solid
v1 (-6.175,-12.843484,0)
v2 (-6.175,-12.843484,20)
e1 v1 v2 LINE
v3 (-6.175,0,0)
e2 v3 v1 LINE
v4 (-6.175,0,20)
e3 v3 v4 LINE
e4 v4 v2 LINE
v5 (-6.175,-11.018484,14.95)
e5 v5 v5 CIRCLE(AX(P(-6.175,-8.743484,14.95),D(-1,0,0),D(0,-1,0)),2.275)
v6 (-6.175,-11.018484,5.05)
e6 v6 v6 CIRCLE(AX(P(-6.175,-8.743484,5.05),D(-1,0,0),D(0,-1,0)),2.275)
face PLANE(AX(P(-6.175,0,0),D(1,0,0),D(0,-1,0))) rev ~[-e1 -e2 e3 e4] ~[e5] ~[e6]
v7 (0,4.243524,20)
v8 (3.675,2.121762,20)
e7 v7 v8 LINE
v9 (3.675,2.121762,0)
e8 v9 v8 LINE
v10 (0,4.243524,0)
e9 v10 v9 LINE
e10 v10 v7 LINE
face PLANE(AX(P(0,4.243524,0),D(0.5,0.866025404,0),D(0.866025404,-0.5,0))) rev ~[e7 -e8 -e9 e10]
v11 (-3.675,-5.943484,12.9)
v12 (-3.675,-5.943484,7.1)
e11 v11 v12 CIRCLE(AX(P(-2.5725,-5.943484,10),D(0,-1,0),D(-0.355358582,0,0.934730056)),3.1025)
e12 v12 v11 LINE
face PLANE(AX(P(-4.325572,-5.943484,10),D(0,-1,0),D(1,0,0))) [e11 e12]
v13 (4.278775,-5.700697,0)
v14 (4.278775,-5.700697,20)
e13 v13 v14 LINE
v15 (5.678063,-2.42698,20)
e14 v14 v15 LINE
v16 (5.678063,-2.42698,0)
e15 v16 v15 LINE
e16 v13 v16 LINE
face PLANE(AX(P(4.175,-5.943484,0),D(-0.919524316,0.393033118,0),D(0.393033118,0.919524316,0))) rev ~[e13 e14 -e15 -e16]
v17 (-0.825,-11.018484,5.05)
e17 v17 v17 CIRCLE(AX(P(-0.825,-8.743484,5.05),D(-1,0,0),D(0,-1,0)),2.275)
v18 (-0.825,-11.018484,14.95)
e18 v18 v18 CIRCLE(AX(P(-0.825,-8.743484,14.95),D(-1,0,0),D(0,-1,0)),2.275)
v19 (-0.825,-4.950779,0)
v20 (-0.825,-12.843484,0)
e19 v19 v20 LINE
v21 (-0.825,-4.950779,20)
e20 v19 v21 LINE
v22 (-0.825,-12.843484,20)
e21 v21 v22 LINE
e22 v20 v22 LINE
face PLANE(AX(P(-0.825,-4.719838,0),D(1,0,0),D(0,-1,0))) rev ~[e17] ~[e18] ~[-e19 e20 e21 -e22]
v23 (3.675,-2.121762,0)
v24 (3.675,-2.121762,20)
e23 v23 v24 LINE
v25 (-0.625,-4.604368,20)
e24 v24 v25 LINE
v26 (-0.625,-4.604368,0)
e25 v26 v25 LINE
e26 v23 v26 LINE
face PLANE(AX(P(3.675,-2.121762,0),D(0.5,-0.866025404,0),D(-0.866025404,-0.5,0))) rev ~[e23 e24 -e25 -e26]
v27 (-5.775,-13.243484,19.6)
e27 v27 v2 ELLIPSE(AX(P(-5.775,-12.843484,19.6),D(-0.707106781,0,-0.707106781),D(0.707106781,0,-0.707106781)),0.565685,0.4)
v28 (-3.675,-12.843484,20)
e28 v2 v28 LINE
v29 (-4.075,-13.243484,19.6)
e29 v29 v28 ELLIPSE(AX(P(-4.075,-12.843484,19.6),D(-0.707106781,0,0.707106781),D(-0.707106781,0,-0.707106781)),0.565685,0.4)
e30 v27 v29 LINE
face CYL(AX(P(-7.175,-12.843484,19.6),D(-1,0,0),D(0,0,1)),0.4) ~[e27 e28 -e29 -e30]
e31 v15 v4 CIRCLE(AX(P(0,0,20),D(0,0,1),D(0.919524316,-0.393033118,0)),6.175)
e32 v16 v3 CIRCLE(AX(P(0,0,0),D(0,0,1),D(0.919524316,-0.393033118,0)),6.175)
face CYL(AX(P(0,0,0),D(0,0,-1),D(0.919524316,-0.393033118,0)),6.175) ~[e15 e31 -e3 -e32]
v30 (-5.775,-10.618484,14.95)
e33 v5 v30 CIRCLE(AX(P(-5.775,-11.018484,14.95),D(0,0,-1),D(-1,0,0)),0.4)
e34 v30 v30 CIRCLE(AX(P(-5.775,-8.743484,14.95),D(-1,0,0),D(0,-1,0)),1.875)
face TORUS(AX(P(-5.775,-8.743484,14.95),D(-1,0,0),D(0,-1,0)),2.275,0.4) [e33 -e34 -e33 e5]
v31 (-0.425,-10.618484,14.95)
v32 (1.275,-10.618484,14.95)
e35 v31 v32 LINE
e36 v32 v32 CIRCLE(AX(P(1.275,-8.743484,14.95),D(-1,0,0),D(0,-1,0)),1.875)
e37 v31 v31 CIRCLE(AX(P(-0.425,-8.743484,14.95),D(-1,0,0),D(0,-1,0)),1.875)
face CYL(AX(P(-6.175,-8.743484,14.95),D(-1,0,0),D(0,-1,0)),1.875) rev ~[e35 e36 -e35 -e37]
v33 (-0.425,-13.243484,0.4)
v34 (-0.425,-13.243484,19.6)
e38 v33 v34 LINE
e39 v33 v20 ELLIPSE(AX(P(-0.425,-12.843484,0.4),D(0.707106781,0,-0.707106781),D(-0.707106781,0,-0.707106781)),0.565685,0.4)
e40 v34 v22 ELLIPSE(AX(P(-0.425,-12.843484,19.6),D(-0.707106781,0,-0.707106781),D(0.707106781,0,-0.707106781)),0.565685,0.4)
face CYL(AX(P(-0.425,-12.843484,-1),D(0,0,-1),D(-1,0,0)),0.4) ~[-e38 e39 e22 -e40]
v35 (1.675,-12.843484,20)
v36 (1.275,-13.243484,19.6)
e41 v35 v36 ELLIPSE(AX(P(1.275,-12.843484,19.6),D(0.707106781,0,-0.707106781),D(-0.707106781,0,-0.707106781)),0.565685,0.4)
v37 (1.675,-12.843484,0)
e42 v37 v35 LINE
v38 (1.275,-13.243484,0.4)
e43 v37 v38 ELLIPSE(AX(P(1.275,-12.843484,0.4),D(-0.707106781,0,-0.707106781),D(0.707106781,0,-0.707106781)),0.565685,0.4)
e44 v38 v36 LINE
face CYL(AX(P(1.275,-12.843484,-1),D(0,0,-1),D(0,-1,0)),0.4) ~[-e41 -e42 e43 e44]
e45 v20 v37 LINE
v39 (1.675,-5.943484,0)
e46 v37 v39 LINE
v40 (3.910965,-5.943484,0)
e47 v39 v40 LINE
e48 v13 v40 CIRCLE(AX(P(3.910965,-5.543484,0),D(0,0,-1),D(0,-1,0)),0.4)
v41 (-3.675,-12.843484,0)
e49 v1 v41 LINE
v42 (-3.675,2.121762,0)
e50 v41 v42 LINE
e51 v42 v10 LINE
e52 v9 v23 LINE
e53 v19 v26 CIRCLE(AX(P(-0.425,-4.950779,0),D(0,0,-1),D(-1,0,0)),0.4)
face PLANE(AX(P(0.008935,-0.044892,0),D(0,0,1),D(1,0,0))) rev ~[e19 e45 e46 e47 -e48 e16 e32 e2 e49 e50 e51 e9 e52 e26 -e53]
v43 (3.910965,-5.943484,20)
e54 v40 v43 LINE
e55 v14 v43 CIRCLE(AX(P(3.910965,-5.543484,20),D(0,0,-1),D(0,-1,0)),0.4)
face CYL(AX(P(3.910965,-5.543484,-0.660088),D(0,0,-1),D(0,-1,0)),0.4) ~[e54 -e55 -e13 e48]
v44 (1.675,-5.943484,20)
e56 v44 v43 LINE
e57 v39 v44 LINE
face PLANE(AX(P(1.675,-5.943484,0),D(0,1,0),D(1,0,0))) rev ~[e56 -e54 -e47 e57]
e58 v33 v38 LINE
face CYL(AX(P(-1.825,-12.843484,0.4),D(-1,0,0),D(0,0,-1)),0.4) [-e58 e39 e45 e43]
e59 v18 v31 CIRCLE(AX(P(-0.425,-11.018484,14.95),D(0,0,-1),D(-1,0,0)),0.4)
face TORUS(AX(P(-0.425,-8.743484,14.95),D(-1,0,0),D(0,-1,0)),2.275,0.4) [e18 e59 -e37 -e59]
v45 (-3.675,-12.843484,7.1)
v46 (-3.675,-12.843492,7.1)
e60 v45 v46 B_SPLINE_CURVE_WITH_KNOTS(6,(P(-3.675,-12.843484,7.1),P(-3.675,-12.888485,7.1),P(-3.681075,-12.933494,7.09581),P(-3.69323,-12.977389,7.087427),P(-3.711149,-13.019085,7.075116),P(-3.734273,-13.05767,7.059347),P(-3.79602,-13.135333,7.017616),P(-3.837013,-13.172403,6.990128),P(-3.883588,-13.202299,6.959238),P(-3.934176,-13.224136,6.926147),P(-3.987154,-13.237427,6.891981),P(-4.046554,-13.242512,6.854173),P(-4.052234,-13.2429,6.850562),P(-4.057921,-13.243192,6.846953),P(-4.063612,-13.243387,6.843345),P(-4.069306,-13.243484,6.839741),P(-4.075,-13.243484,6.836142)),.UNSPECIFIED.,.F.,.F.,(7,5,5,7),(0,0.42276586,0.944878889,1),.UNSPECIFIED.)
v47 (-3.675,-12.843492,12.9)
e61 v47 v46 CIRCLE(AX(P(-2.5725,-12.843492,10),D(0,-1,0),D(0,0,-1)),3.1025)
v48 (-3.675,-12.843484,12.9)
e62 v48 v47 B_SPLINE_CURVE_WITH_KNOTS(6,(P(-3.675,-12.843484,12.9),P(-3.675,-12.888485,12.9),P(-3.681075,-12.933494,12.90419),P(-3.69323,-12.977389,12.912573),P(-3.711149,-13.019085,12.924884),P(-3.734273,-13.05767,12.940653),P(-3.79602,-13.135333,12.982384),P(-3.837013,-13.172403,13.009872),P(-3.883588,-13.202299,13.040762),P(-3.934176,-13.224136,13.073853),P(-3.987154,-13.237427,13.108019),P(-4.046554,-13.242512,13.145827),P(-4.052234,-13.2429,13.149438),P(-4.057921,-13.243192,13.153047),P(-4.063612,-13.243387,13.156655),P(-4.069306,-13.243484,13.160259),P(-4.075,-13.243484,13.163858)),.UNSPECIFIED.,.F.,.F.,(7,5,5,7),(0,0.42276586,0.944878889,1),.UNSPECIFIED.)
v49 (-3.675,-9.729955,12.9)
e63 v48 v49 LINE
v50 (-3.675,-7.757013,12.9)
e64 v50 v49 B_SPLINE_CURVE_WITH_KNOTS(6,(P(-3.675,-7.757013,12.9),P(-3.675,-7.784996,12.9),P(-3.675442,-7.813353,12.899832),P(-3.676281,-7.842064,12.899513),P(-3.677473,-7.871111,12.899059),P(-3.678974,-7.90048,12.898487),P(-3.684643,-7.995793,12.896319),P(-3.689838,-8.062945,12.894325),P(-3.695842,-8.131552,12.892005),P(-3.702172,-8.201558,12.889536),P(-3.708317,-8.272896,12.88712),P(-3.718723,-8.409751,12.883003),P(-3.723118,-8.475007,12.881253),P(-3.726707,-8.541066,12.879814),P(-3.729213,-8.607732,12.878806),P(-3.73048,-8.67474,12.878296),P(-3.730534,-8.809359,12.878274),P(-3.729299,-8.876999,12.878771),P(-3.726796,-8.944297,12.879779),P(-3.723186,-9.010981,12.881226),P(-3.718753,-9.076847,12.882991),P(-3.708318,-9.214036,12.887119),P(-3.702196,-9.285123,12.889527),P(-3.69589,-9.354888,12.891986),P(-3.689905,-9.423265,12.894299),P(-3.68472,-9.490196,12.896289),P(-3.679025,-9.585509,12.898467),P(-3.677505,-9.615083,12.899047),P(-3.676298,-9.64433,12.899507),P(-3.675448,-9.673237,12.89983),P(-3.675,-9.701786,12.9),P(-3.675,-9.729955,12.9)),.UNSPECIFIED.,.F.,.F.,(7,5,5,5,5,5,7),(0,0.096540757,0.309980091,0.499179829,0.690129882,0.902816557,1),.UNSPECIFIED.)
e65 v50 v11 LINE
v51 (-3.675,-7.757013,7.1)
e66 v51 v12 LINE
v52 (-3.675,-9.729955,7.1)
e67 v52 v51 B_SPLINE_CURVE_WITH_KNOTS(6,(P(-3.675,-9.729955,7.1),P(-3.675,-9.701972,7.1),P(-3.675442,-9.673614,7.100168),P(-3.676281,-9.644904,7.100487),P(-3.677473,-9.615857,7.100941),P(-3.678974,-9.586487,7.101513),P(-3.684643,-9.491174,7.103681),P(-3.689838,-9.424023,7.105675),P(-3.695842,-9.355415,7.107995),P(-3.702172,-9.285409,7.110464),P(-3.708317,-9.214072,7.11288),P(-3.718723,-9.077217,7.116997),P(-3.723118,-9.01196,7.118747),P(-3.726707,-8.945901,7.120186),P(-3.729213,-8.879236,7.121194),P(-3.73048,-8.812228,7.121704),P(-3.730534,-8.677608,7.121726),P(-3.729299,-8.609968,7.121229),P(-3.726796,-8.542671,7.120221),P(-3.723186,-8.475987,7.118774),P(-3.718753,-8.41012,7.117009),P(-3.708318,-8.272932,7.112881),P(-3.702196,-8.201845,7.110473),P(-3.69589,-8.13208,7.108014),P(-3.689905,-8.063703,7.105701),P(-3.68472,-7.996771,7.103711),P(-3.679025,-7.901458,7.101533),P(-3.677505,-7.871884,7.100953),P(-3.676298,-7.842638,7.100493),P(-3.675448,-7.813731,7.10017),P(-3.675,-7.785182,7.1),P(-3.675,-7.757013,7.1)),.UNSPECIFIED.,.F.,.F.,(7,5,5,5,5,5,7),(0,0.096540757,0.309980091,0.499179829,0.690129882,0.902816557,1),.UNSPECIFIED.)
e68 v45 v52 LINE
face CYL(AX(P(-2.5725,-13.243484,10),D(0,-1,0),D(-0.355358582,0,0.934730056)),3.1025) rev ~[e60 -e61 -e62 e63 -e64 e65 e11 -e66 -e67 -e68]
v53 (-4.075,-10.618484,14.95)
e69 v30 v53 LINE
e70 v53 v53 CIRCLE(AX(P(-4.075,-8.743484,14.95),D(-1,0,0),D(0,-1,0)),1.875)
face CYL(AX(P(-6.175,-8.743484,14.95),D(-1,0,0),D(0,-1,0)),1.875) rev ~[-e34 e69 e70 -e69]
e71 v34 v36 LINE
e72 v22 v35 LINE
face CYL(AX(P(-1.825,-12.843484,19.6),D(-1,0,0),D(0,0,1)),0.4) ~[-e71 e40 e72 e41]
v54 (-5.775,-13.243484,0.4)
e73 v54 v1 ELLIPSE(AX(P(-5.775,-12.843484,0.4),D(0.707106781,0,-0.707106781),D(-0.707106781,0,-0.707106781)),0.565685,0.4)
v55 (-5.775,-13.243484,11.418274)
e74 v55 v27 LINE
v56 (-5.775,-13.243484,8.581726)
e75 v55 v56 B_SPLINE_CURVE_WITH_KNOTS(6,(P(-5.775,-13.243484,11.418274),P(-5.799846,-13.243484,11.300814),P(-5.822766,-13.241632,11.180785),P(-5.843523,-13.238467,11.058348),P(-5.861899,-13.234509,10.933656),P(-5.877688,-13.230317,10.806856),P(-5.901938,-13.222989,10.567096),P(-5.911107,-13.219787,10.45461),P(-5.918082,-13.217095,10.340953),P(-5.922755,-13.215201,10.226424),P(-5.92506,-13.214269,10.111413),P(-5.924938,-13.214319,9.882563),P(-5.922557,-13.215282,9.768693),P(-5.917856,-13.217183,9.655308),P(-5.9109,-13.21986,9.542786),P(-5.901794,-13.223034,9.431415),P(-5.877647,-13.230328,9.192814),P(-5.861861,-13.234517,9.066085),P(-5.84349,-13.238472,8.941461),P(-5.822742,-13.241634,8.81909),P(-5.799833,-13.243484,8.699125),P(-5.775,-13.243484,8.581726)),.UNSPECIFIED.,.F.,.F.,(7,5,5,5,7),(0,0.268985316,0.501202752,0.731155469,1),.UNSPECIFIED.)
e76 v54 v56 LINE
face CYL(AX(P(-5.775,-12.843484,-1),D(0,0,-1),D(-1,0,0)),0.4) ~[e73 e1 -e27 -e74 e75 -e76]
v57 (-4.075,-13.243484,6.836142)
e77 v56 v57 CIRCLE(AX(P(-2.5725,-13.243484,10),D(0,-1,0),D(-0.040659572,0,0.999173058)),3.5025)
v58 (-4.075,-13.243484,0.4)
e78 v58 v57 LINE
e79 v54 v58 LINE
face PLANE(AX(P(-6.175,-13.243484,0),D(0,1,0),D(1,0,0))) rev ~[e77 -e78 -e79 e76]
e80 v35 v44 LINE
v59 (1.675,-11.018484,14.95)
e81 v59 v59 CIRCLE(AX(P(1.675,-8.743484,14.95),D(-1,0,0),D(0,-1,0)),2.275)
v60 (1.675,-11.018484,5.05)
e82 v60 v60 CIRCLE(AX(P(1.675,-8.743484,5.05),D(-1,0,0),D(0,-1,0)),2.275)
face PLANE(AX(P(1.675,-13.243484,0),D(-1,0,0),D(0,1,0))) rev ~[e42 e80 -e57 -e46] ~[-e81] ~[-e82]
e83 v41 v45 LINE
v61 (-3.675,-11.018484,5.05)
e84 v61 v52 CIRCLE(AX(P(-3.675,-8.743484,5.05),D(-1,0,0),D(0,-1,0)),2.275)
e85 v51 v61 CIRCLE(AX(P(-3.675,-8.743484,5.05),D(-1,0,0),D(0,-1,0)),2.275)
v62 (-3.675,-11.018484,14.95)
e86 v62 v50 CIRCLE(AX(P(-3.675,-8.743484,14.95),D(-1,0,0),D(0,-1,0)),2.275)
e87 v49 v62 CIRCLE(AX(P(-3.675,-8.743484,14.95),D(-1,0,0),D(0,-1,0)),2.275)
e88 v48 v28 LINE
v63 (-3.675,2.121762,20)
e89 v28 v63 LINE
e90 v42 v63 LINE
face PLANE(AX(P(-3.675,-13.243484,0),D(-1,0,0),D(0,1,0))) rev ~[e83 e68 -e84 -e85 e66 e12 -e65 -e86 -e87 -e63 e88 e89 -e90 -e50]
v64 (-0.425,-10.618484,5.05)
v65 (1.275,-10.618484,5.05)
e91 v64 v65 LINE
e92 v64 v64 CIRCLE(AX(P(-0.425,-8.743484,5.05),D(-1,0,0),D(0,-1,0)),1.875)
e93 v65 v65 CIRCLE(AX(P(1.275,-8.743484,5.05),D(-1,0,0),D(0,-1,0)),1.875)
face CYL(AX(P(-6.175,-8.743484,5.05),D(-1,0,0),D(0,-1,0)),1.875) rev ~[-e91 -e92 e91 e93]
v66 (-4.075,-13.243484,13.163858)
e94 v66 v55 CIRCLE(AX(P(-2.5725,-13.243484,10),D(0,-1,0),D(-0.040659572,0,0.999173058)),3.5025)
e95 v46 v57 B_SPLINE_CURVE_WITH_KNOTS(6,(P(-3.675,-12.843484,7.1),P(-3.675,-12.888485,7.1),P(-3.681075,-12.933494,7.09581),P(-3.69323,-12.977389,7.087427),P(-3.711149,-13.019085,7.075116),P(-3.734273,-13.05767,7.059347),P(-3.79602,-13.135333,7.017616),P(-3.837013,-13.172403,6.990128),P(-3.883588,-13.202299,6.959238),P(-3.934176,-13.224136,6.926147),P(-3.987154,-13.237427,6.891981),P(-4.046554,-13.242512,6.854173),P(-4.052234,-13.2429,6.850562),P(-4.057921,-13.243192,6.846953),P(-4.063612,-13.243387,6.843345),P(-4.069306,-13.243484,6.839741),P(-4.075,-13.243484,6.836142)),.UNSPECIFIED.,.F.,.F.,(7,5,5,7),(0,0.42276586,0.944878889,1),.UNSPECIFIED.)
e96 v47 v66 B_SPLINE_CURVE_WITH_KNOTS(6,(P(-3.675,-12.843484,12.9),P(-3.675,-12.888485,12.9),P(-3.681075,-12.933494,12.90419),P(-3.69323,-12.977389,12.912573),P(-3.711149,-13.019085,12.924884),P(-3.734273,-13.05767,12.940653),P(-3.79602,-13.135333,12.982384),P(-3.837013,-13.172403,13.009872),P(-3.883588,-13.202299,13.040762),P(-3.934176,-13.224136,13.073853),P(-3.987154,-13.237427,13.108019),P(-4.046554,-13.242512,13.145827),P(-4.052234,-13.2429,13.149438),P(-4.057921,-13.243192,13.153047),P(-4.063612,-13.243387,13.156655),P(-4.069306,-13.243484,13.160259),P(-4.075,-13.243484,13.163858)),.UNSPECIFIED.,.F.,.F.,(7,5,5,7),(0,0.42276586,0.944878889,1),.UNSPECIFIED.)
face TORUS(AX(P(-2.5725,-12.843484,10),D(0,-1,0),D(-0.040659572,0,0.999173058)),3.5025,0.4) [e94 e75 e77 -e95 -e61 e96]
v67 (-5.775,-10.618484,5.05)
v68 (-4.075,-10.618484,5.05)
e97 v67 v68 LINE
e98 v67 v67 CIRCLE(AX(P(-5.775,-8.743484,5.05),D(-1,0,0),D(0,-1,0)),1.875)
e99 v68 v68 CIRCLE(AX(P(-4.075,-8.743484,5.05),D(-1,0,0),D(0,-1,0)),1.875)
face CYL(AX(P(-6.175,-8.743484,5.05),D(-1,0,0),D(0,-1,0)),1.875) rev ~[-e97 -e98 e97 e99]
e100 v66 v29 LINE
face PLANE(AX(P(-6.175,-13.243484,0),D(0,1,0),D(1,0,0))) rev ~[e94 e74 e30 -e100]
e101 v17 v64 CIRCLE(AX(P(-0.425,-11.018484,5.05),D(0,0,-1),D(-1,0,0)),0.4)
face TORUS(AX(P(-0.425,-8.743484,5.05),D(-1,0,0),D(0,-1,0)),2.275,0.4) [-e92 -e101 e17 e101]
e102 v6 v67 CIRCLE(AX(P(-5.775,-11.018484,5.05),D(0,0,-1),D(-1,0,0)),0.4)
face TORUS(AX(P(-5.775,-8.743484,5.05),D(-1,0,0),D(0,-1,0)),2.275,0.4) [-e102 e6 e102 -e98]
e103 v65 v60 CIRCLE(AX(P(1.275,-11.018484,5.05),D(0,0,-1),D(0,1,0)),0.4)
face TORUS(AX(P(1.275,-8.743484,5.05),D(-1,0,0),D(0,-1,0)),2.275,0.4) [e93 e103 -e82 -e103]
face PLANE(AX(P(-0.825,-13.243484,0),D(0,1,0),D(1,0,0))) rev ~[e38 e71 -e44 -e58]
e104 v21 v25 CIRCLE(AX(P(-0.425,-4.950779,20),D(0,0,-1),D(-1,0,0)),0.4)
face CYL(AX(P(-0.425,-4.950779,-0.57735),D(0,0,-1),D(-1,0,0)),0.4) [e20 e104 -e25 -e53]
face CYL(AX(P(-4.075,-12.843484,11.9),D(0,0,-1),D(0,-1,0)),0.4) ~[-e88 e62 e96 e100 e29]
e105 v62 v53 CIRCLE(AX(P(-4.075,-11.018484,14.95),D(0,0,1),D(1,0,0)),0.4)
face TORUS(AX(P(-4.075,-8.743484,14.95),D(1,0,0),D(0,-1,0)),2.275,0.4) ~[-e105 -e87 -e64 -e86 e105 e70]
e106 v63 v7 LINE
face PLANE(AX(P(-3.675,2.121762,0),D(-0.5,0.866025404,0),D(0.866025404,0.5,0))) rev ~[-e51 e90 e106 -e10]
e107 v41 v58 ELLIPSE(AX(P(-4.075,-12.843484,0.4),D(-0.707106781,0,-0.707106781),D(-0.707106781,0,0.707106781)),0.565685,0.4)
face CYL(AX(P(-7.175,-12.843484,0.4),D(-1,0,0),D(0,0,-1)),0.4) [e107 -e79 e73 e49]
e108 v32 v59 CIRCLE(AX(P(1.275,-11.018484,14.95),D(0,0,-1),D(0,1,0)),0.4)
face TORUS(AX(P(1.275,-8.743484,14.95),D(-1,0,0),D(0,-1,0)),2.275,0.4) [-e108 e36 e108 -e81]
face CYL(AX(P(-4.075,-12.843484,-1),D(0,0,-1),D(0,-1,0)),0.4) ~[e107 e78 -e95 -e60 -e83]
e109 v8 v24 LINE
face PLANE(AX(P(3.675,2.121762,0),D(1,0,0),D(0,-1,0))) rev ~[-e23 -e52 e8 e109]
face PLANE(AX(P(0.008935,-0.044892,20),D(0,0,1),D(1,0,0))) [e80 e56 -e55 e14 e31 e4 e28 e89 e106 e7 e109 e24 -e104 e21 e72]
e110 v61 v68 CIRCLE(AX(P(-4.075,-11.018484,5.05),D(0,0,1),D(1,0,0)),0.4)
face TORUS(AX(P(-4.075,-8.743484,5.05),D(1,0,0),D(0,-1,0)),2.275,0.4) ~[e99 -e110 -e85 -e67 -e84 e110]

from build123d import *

# Parameters (mm, degrees)
F1_DEPTH     = 20
F2_R         = 1.875
F3_DEPTH     = 12.351
F5_DEPTH     = 7.3
F6_T1_DEPTH  = 21.1547005384
F6_T3_DEPTH  = 21.3201758156
F6_T5_DEPTH  = 22
F6_T7_DEPTH  = 4.5
F6_T9_DEPTH  = 4.5
F6_T11_DEPTH = 9.1
F6_T13_DEPTH = 9.1
F6_T32_ANGLE = 175.3394715145


# Not quite as in the source:
# - a fillet or chamfer that OpenCascade refuses, or shapes differently, is made with other operations: its cross-section is extruded or revolved along the edge and cut away or added


with BuildPart() as f1:
    # F0 (on Top) → F1 (new body)
    with BuildSketch(Plane.XY):
        with BuildLine():
            Line((-0.825, -4.7198384506), (-0.825, -6.1196405123))
            ThreePointArc((-0.825, -6.1196405123), (0.4340308681, -6.1597274457), (1.675, -5.9434838268))
            ThreePointArc((1.675, -5.9434838268), (4.0753322883, -4.6392124051), (5.6780626531, -2.4269795028))
            ThreePointArc((5.6780626531, -2.4269795028), (1.2386662418, 6.049490139), (-6.175, 0))
            ThreePointArc((-6.175, 0), (-5.5146962745, -2.7782638464), (-3.675, -4.9623583103))
            Line((-3.675, -4.9623583103), (-3.675, -2.1217622393))
            Line((-3.675, -2.1217622393), (-3.675, 0))
            Line((-3.675, 0), (-3.675, 2.1217622393))
            Line((-3.675, 2.1217622393), (0, 4.2435244785))
            Line((0, 4.2435244785), (3.675, 2.1217622393))
            Line((3.675, 2.1217622393), (3.675, -2.1217622393))
            Line((3.675, -2.1217622393), (-0.825, -4.7198384506))
        make_face()
        with BuildLine():
            ThreePointArc((1.675, -5.9434838268), (0.4340308681, -6.1597274457), (-0.825, -6.1196405123))
            Line((-0.825, -6.1196405123), (-0.825, -13.2434838268))
            Line((-0.825, -13.2434838268), (1.675, -13.2434838268))
            Line((1.675, -13.2434838268), (1.675, -5.9434838268))
        make_face()
        with BuildLine():
            ThreePointArc((5.6780626531, -2.4269795028), (4.0753322883, -4.6392124051), (1.675, -5.9434838268))
            Line((1.675, -5.9434838268), (4.175, -5.9434838268))
            Line((4.175, -5.9434838268), (5.6780626531, -2.4269795028))
        make_face()
        with BuildLine():
            ThreePointArc((-3.675, -4.9623583103), (-5.5146962745, -2.7782638464), (-6.175, 0))
            Line((-6.175, 0), (-6.175, -7.2434838268))
            Line((-6.175, -7.2434838268), (-6.175, -10.2434838268))
            Line((-6.175, -10.2434838268), (-6.175, -13.2434838268))
            Line((-6.175, -13.2434838268), (-3.675, -13.2434838268))
            Line((-3.675, -13.2434838268), (-3.675, -4.9623583103))
        make_face()
    extrude(amount=F1_DEPTH)

    # F2 (on face) → F3 (cut, through all)
    with BuildSketch(Plane(origin=(-6.175, 0, 0), x_dir=(0, -1, 0), z_dir=(-1, 0, 0))):
        with Locations((8.7434838268, 14.95)):
            Circle(F2_R)
        with Locations((8.7434838268, 5.05)):
            Circle(F2_R)
    extrude(amount=-F3_DEPTH, mode=Mode.SUBTRACT)

    # F4 (on face) → F5 (cut, through all)
    with BuildSketch(Plane.XZ.offset(13.2434838268)):
        with BuildLine():
            ThreePointArc((-3.675, 12.9), (-5.675, 10), (-3.675, 7.1))
            Line((-3.675, 7.1), (-3.675, 12.9))
        make_face()
    extrude(amount=-F5_DEPTH, mode=Mode.SUBTRACT)

    # F6: fillet of radius 0.4 on 24 edges, made by hand

    # F6_s2 → F6_t1 (cut)
    with BuildSketch(Plane.XY.offset(-0.5773502692)):
        with BuildLine():
            ThreePointArc((-0.825, -4.9507785583), (-0.7714101615, -4.7507785583), (-0.625, -4.6043683968))
            Line((-0.625, -4.6043683968), (-0.825, -4.7198384506))
            Line((-0.825, -4.7198384506), (-0.825, -4.9507785583))
        make_face()
    extrude(amount=F6_T1_DEPTH, mode=Mode.SUBTRACT)

    # F6_s4 → F6_t3 (cut)
    with BuildSketch(Plane.XY.offset(-0.6600879078)):
        with BuildLine():
            ThreePointArc((3.9109648369, -5.9434838268), (4.1313221616, -5.8773140972), (4.2787745634, -5.700697074))
            Line((4.2787745634, -5.700697074), (4.175, -5.9434838268))
            Line((4.175, -5.9434838268), (3.9109648369, -5.9434838268))
        make_face()
    extrude(amount=F6_T3_DEPTH, mode=Mode.SUBTRACT)

    # F6_s6 → F6_t5 (cut)
    with BuildSketch(Plane.XY.offset(-1)):
        with BuildLine():
            ThreePointArc((-0.825, -12.8434838268), (-0.7078427125, -13.1263265393), (-0.425, -13.2434838268))
            Line((-0.425, -13.2434838268), (-0.825, -13.2434838268))
            Line((-0.825, -13.2434838268), (-0.825, -12.8434838268))
        make_face()
        with BuildLine():
            ThreePointArc((1.275, -13.2434838268), (1.5578427125, -13.1263265393), (1.675, -12.8434838268))
            Line((1.675, -12.8434838268), (1.675, -13.2434838268))
            Line((1.675, -13.2434838268), (1.275, -13.2434838268))
        make_face()
        with BuildLine():
            ThreePointArc((-6.175, -12.8434838268), (-6.0578427125, -13.1263265393), (-5.775, -13.2434838268))
            Line((-5.775, -13.2434838268), (-6.175, -13.2434838268))
            Line((-6.175, -13.2434838268), (-6.175, -12.8434838268))
        make_face()
    extrude(amount=F6_T5_DEPTH, mode=Mode.SUBTRACT)

    # F6_s8 → F6_t7 (cut)
    with BuildSketch(Plane.YZ.offset(-1.825)):
        with BuildLine():
            ThreePointArc((-12.8434838268, 0), (-13.1263265393, 0.1171572875), (-13.2434838268, 0.4))
            Line((-13.2434838268, 0.4), (-13.2434838268, 0))
            Line((-13.2434838268, 0), (-12.8434838268, 0))
        make_face()
        with BuildLine():
            ThreePointArc((-12.8434838268, 20), (-13.1263265393, 19.8828427125), (-13.2434838268, 19.6))
            Line((-13.2434838268, 19.6), (-13.2434838268, 20))
            Line((-13.2434838268, 20), (-12.8434838268, 20))
        make_face()
    extrude(amount=F6_T7_DEPTH, mode=Mode.SUBTRACT)

    # F6_s10 → F6_t9 (cut)
    with BuildSketch(Plane.YZ.offset(-7.175)):
        with BuildLine():
            ThreePointArc((-12.8434838268, 0), (-13.1263265393, 0.1171572875), (-13.2434838268, 0.4))
            Line((-13.2434838268, 0.4), (-13.2434838268, 0))
            Line((-13.2434838268, 0), (-12.8434838268, 0))
        make_face()
        with BuildLine():
            ThreePointArc((-12.8434838268, 20), (-13.1263265393, 19.8828427125), (-13.2434838268, 19.6))
            Line((-13.2434838268, 19.6), (-13.2434838268, 20))
            Line((-13.2434838268, 20), (-12.8434838268, 20))
        make_face()
    extrude(amount=F6_T9_DEPTH, mode=Mode.SUBTRACT)

    # F6_s12 → F6_t11 (cut)
    with BuildSketch(Plane.XY.offset(-1)):
        with BuildLine():
            ThreePointArc((-4.075, -13.2434838268), (-3.7921572875, -13.1263265393), (-3.675, -12.8434838268))
            Line((-3.675, -12.8434838268), (-3.675, -13.2434838268))
            Line((-3.675, -13.2434838268), (-4.075, -13.2434838268))
        make_face()
    extrude(amount=F6_T11_DEPTH, mode=Mode.SUBTRACT)

    # F6_s14 → F6_t13 (cut)
    with BuildSketch(Plane.XY.offset(11.9)):
        with BuildLine():
            ThreePointArc((-4.075, -13.2434838268), (-3.7921572875, -13.1263265393), (-3.675, -12.8434838268))
            Line((-3.675, -12.8434838268), (-3.675, -13.2434838268))
            Line((-3.675, -13.2434838268), (-4.075, -13.2434838268))
        make_face()
    extrude(amount=F6_T13_DEPTH, mode=Mode.SUBTRACT)

    # F6_s15 → F6_t16 (revolve, cut)
    with BuildSketch(Plane.XY.offset(14.95)):
        with BuildLine():
            ThreePointArc((-0.825, -11.0184838268), (-0.7078427125, -10.7356411144), (-0.425, -10.6184838268))
            Line((-0.425, -10.6184838268), (-0.825, -10.6184838268))
            Line((-0.825, -10.6184838268), (-0.825, -11.0184838268))
        make_face()
    revolve(axis=Axis((-0.825, -8.7434838268, 14.95), (-1, 0, 0)), mode=Mode.SUBTRACT)

    # F6_s17 → F6_t18 (revolve, cut)
    with BuildSketch(Plane.XY.offset(14.95)):
        with BuildLine():
            ThreePointArc((1.275, -10.6184838268), (1.5578427125, -10.7356411144), (1.675, -11.0184838268))
            Line((1.675, -11.0184838268), (1.675, -10.6184838268))
            Line((1.675, -10.6184838268), (1.275, -10.6184838268))
        make_face()
    revolve(axis=Axis((1.675, -8.7434838268, 14.95), (-1, 0, 0)), mode=Mode.SUBTRACT)

    # F6_s19 → F6_t20 (revolve, cut)
    with BuildSketch(Plane.XY.offset(5.05)):
        with BuildLine():
            ThreePointArc((-0.825, -11.0184838268), (-0.7078427125, -10.7356411144), (-0.425, -10.6184838268))
            Line((-0.425, -10.6184838268), (-0.825, -10.6184838268))
            Line((-0.825, -10.6184838268), (-0.825, -11.0184838268))
        make_face()
    revolve(axis=Axis((-0.825, -8.7434838268, 5.05), (-1, 0, 0)), mode=Mode.SUBTRACT)

    # F6_s21 → F6_t22 (revolve, cut)
    with BuildSketch(Plane.XY.offset(5.05)):
        with BuildLine():
            ThreePointArc((1.275, -10.6184838268), (1.5578427125, -10.7356411144), (1.675, -11.0184838268))
            Line((1.675, -11.0184838268), (1.675, -10.6184838268))
            Line((1.675, -10.6184838268), (1.275, -10.6184838268))
        make_face()
    revolve(axis=Axis((1.675, -8.7434838268, 5.05), (-1, 0, 0)), mode=Mode.SUBTRACT)

    # F6_s23 → F6_t24 (revolve, cut)
    with BuildSketch(Plane.XY.offset(5.05)):
        with BuildLine():
            ThreePointArc((-6.175, -11.0184838268), (-6.0578427125, -10.7356411144), (-5.775, -10.6184838268))
            Line((-5.775, -10.6184838268), (-6.175, -10.6184838268))
            Line((-6.175, -10.6184838268), (-6.175, -11.0184838268))
        make_face()
    revolve(axis=Axis((-6.175, -8.7434838268, 5.05), (-1, 0, 0)), mode=Mode.SUBTRACT)

    # F6_s25 → F6_t26 (revolve, cut)
    with BuildSketch(Plane.XY.offset(5.05)):
        with BuildLine():
            ThreePointArc((-3.675, -11.0184838268), (-3.7921572875, -10.7356411144), (-4.075, -10.6184838268))
            Line((-4.075, -10.6184838268), (-3.675, -10.6184838268))
            Line((-3.675, -10.6184838268), (-3.675, -11.0184838268))
        make_face()
    revolve(axis=Axis((-3.675, -8.7434838268, 5.05), (-1, 0, 0)), mode=Mode.SUBTRACT)

    # F6_s27 → F6_t28 (revolve, cut)
    with BuildSketch(Plane.XY.offset(14.95)):
        with BuildLine():
            ThreePointArc((-6.175, -11.0184838268), (-6.0578427125, -10.7356411144), (-5.775, -10.6184838268))
            Line((-5.775, -10.6184838268), (-6.175, -10.6184838268))
            Line((-6.175, -10.6184838268), (-6.175, -11.0184838268))
        make_face()
    revolve(axis=Axis((-6.175, -8.7434838268, 14.95), (-1, 0, 0)), mode=Mode.SUBTRACT)

    # F6_s29 → F6_t30 (revolve, cut)
    with BuildSketch(Plane.XY.offset(14.95)):
        with BuildLine():
            ThreePointArc((-3.675, -11.0184838268), (-3.7921572875, -10.7356411144), (-4.075, -10.6184838268))
            Line((-4.075, -10.6184838268), (-3.675, -10.6184838268))
            Line((-3.675, -10.6184838268), (-3.675, -11.0184838268))
        make_face()
    revolve(axis=Axis((-3.675, -8.7434838268, 14.95), (-1, 0, 0)), mode=Mode.SUBTRACT)

    # F6_s31 → F6_t32 (revolve, cut)
    with BuildSketch(Plane(origin=(-2.1619876515, 0, -0.0879782456), x_dir=(0, 1, 0), z_dir=(0.9991730577, 0, 0.0406595721))):
        with BuildLine():
            ThreePointArc((-13.2434838268, 13.598827326), (-13.1263265393, 13.3159846135), (-12.8434838268, 13.198827326))
            Line((-12.8434838268, 13.198827326), (-13.2434838268, 13.198827326))
            Line((-13.2434838268, 13.198827326), (-13.2434838268, 13.598827326))
        make_face()
    revolve(axis=Axis((-2.5725, -13.2434838268, 10), (0, -1, 0)), revolution_arc=F6_T32_ANGLE, mode=Mode.SUBTRACT)


solid = f1.part
